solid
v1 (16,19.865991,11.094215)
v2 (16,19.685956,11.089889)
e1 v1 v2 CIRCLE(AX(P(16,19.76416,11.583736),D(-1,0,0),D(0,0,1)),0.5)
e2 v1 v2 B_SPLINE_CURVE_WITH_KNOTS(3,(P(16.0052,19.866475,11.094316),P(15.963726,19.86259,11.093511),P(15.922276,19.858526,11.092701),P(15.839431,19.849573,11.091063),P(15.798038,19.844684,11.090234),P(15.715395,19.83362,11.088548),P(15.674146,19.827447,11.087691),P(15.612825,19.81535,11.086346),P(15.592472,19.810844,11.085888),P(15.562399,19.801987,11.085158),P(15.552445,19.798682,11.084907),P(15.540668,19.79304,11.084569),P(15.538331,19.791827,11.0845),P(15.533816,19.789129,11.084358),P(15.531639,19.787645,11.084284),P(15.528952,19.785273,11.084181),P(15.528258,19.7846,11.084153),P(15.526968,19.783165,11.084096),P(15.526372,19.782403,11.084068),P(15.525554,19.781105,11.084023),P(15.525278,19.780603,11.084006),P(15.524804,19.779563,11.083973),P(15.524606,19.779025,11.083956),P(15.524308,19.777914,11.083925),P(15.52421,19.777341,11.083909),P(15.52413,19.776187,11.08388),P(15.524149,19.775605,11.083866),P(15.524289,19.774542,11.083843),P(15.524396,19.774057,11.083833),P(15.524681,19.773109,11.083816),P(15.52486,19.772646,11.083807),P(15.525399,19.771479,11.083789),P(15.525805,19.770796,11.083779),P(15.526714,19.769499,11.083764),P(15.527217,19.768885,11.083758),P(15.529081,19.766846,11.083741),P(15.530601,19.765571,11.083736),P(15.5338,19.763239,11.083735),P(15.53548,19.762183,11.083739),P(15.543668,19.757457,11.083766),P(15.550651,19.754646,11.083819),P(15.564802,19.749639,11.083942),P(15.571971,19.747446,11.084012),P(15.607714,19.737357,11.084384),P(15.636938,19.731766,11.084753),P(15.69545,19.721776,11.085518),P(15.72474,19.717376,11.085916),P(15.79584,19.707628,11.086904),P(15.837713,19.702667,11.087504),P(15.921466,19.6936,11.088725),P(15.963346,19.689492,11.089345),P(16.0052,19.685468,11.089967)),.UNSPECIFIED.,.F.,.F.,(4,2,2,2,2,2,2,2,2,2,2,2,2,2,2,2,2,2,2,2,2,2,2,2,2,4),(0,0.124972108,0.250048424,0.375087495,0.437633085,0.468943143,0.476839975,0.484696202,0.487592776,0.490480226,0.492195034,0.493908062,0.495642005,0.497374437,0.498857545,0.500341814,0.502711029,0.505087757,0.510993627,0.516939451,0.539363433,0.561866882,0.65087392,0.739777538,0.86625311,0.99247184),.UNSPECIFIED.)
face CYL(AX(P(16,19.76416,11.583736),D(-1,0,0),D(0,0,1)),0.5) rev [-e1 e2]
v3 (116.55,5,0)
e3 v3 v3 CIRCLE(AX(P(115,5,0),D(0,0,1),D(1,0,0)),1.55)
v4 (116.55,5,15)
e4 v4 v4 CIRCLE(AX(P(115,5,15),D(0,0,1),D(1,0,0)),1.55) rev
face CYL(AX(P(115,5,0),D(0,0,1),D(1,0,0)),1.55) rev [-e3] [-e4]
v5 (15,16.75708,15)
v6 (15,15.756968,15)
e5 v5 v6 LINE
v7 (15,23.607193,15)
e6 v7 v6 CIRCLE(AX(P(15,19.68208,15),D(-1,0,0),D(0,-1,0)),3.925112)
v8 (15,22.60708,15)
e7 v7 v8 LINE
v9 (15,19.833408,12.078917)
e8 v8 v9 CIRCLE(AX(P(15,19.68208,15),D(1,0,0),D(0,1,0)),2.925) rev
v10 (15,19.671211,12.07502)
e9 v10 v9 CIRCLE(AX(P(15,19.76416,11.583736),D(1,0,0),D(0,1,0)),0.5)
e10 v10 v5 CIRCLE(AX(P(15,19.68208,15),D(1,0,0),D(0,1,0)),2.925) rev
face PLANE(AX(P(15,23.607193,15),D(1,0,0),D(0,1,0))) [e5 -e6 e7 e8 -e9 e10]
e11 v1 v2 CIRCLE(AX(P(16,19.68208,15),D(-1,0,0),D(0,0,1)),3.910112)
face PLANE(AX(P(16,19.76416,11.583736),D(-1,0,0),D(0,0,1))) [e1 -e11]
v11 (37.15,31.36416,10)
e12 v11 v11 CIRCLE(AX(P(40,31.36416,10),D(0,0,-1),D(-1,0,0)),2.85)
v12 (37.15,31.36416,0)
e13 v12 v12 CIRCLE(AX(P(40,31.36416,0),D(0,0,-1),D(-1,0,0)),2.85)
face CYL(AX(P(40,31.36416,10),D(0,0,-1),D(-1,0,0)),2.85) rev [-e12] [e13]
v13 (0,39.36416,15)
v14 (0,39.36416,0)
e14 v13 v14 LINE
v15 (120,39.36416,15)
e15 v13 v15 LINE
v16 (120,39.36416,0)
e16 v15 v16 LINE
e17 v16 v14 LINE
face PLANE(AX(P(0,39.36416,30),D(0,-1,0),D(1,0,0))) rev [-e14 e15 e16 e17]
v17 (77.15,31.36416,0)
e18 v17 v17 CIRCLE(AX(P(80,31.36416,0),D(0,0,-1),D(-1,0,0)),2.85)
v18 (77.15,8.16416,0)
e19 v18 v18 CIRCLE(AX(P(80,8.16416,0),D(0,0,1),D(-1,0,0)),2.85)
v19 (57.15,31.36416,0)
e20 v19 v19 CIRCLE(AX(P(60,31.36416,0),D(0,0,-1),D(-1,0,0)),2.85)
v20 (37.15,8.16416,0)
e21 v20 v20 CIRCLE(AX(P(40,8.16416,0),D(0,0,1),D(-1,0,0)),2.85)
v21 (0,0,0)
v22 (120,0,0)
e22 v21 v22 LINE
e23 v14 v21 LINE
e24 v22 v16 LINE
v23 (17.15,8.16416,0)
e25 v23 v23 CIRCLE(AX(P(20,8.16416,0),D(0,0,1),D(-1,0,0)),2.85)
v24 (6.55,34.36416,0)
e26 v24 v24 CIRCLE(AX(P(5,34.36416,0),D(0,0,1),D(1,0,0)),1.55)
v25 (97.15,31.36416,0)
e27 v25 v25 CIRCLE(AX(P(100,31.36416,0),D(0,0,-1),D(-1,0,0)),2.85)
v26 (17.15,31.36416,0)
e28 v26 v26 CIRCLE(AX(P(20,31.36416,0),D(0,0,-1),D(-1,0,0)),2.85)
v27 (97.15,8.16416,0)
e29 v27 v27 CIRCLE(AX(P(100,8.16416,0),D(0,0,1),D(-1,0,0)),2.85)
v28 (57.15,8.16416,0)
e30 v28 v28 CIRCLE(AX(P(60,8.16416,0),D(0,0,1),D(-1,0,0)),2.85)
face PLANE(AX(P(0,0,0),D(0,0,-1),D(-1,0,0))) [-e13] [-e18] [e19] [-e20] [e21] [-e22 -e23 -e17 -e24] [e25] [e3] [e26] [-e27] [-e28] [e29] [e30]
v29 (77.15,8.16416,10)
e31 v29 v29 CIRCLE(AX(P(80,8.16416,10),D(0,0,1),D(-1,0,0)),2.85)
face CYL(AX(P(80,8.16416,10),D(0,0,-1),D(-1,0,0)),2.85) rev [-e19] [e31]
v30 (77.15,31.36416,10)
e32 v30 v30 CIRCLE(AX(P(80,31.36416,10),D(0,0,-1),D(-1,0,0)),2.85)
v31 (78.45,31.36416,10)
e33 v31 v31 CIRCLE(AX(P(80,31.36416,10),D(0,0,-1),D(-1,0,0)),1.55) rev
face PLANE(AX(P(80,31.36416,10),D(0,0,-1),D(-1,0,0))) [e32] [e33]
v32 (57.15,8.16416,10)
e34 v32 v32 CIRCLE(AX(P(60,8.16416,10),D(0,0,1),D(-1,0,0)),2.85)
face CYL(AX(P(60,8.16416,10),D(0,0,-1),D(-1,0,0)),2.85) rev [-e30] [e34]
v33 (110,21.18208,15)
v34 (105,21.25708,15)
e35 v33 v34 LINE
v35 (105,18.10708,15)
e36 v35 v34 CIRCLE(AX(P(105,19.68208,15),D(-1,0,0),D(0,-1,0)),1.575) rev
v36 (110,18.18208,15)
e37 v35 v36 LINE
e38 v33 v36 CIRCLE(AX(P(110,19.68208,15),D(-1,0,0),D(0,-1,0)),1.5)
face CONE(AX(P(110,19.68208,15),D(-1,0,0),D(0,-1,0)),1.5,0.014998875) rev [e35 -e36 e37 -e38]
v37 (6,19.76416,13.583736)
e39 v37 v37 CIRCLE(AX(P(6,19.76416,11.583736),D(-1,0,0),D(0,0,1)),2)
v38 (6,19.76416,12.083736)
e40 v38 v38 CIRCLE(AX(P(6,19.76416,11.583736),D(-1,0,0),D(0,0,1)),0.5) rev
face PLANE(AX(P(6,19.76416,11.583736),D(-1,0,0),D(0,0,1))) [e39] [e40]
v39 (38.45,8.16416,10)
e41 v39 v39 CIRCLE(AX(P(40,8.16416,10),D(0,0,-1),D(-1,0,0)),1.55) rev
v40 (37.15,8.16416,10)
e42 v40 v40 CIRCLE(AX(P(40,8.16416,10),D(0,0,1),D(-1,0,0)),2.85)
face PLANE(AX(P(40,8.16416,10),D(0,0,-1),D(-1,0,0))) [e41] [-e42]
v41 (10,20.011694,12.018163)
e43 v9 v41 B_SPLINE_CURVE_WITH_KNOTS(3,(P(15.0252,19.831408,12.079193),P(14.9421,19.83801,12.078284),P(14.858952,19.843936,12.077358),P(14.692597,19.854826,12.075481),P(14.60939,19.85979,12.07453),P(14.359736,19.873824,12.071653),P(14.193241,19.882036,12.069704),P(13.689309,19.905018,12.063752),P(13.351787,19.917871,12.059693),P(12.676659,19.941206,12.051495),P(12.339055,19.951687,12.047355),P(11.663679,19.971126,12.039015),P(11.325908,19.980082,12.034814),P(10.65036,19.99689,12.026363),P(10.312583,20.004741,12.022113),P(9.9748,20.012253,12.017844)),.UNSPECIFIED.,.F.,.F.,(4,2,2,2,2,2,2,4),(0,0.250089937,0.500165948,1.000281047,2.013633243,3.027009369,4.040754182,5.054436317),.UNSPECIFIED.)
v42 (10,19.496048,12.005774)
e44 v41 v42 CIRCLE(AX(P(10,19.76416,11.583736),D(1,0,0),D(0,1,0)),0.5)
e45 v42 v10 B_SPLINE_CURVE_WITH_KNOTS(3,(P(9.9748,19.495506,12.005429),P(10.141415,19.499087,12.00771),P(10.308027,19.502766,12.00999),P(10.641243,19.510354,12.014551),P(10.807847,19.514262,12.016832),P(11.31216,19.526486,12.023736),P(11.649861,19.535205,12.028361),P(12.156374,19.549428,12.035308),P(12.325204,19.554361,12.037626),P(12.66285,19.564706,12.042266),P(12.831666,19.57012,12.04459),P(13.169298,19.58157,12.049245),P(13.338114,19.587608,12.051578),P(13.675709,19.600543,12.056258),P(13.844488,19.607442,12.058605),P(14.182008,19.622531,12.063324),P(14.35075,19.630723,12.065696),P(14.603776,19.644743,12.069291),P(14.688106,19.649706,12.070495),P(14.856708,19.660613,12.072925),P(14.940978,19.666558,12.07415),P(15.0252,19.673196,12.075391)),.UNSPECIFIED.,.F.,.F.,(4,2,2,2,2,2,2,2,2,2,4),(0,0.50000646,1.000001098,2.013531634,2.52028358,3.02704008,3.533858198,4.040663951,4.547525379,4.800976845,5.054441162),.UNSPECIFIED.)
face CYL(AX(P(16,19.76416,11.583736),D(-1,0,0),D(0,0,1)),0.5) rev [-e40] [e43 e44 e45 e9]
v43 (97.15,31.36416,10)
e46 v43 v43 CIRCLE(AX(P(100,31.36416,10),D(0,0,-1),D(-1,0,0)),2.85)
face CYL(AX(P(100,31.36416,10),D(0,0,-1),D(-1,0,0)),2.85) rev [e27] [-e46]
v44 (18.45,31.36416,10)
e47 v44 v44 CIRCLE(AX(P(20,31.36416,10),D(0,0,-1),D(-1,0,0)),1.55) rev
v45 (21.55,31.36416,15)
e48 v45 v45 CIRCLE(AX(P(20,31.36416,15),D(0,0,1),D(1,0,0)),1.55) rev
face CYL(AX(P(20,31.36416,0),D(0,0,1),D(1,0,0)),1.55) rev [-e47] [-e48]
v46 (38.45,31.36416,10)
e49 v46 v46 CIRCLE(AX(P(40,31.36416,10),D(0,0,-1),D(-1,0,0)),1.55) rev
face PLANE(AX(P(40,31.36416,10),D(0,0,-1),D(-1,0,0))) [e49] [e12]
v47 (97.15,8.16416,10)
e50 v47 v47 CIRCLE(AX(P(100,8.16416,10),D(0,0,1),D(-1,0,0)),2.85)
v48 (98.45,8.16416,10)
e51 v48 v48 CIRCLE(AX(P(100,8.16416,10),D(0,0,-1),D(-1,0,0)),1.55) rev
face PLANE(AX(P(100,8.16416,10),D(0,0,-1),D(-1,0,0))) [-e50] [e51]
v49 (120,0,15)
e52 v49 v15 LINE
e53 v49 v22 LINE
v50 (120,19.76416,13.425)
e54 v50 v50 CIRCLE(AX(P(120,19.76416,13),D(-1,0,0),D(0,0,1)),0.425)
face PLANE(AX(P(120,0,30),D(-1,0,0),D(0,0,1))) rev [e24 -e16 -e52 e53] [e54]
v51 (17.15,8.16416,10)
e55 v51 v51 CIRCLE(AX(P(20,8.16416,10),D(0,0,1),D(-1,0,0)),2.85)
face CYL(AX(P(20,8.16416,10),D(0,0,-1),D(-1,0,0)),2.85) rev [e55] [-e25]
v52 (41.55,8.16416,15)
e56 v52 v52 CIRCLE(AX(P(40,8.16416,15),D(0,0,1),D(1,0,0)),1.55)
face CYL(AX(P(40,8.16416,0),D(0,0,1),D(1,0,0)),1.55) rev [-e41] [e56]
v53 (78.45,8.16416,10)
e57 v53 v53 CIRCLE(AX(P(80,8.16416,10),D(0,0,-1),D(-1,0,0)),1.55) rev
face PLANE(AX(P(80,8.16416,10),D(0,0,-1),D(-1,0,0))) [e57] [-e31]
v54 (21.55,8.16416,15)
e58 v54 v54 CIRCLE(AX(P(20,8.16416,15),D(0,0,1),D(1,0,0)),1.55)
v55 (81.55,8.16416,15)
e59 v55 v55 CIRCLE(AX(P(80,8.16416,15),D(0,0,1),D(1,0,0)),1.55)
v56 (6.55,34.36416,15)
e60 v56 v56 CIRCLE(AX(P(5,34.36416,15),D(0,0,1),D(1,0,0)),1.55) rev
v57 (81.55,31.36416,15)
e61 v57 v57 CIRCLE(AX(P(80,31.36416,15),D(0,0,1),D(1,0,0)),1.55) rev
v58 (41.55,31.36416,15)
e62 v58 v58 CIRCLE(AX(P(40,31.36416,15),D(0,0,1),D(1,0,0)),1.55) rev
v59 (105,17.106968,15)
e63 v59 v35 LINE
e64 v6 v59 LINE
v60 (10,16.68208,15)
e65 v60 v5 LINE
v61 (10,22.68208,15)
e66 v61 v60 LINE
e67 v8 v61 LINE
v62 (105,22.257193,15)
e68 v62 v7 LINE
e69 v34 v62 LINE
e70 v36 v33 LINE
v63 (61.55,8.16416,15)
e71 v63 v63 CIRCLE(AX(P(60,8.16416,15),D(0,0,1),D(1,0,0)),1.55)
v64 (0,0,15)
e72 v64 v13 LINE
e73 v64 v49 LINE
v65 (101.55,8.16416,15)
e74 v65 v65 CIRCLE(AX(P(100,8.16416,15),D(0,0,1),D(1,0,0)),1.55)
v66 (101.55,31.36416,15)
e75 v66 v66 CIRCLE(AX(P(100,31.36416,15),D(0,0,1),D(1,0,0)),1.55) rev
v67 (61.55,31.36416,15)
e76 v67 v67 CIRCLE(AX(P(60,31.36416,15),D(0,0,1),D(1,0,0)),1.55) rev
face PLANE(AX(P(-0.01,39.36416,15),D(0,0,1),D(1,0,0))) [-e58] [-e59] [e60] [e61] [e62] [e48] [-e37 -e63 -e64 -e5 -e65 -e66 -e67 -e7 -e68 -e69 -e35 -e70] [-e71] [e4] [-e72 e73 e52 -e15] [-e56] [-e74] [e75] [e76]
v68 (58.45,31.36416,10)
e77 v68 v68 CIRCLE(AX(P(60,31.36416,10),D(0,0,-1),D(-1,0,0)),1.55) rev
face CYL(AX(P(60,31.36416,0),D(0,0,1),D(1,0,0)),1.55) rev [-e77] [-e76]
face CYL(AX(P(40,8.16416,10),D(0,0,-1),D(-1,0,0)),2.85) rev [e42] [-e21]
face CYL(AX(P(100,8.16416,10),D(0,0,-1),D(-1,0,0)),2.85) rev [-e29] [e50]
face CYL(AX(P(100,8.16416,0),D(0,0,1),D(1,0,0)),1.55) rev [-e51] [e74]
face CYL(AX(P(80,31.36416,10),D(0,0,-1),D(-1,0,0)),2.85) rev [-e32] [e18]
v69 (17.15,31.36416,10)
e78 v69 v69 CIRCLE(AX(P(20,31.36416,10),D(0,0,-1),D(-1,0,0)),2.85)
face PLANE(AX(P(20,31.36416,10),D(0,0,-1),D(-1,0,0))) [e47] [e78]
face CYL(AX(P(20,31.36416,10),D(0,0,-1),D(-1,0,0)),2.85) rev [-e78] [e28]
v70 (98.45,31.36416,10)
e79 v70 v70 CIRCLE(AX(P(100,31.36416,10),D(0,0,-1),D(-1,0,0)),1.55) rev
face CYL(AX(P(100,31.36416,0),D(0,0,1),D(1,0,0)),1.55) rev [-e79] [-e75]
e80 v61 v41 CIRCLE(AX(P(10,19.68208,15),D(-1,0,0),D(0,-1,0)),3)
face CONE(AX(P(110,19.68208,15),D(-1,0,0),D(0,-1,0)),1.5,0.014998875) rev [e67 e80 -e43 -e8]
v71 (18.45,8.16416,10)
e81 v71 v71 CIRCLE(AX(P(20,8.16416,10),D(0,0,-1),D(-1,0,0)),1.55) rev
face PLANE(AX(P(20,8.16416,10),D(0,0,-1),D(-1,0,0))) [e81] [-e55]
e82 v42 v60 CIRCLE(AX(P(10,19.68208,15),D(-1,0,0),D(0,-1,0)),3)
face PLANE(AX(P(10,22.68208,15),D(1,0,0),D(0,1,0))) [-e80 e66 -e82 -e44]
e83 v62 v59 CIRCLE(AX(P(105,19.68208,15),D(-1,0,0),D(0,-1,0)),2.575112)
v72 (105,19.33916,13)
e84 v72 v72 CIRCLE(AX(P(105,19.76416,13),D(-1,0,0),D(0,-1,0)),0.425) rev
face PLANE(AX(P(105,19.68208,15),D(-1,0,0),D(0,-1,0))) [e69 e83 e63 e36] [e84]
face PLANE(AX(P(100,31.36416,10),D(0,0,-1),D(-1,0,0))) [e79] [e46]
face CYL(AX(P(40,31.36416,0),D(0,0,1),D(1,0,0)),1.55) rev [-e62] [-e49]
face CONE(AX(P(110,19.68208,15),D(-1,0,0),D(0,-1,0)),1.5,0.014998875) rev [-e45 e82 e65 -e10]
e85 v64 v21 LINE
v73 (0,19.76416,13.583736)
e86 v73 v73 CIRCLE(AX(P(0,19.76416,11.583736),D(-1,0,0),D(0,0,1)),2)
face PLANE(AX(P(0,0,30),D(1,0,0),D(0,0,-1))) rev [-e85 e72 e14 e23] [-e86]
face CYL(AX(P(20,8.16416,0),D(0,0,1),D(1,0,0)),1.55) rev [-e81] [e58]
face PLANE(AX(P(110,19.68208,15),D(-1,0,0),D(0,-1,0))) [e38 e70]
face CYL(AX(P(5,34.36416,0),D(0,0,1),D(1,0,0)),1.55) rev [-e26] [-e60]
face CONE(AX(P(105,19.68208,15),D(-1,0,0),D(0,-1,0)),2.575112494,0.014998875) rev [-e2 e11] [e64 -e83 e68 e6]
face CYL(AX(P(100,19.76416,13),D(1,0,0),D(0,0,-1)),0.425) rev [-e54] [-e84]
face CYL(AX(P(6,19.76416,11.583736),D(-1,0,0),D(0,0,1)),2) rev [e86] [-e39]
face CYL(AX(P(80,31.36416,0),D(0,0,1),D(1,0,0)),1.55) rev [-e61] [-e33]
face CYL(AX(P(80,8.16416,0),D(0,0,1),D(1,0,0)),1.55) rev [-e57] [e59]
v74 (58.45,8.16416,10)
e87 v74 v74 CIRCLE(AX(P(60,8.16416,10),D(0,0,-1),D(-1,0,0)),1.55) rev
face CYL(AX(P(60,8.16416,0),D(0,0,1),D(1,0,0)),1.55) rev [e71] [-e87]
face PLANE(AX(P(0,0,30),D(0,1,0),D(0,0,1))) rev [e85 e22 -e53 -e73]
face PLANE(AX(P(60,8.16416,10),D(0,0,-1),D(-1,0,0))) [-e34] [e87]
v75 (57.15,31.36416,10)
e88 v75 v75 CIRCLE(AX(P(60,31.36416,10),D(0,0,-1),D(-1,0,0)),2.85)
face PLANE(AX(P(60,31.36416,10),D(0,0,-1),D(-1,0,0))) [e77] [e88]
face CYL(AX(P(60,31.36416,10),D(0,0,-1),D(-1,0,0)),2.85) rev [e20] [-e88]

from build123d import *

# Parameters (mm, degrees)
SKIZZE2_W                        = 120
SKIZZE2_H                        = 39.364160046
AUFSATZ_LINEAR_AUSTRAGEN1_DEPTH  = 30
SKIZZE24_R                       = 1.55
SCHNITT_LINEAR_AUSTRAGEN4_DEPTH  = 130.805766806
SKIZZE46_R                       = 2.85
SCHNITT_LINEAR_AUSTRAGEN15_DEPTH = 10
SCHNITT_LINEAR_START             = -5
SCHNITT_LINEAR_AUSTRAGEN25_DEPTH = 2.7
LINEARES_MUSTER1_COUNT           = 5
LINEARES_MUSTER1_PITCH           = 20
SPIEGELN2_COPY_1_SKETCH_R        = 2.85
SPIEGELN2_COPY_1_DEPTH           = 10
SPIEGELN2_COPY_2_SKETCH_R        = 2.85
SPIEGELN2_COPY_2_DEPTH           = 10
SPIEGELN2_COPY_3_SKETCH_R        = 2.85
SPIEGELN2_COPY_3_DEPTH           = 10
SPIEGELN2_COPY_4_SKETCH_R        = 2.85
SPIEGELN2_COPY_4_DEPTH           = 10
SPIEGELN2_START                  = -5
SPIEGELN2_COPY_5_DEPTH           = 2.7
SPIEGELN2_COPY_6_DEPTH           = 2.7
SPIEGELN2_COPY_7_DEPTH           = 2.7
SPIEGELN2_COPY_8_DEPTH           = 2.7
SKIZZE51_R                       = 1.55
SCHNITT_LINEAR_AUSTRAGEN26_DEPTH = 130.805766806
SKIZZE67_R                       = 0.425
SCHNITT_LINEAR_AUSTRAGEN30_DEPTH = 20
SKIZZE70_R                       = 0.5
SCHNITT_LINEAR_AUSTRAGEN37_DEPTH = 16
SKIZZE71_R                       = 2
SCHNITT_LINEAR_AUSTRAGEN38_DEPTH = 6
ABSPALTEN3_START                 = 15
ABSPALTEN3_OUTLINE_W             = 120
ABSPALTEN3_OUTLINE_H             = 39.364160046
ABSPALTEN3_OUTLINE_R             = 1.55
ABSPALTEN3_DEPTH                 = 15


# Read off the part's stored shape, not the designer's step: Abspalten3
with BuildPart() as part:
    # Skizze2 → Aufsatz-Linear austragen1 (new body)
    with BuildSketch(Plane.XY):
        with Locations((60, 19.682080023)):
            Rectangle(SKIZZE2_W, SKIZZE2_H)
    extrude(amount=AUFSATZ_LINEAR_AUSTRAGEN1_DEPTH)

    # Skizze24 → Schnitt-Linear austragen4 (cut, through all)
    with BuildSketch(Plane.XY.offset(30)):
        with Locations((20, 31.364160046)):
            Circle(SKIZZE24_R)
        with Locations((40, 31.364160046)):
            Circle(SKIZZE24_R)
        with Locations((60, 31.364160046)):
            Circle(SKIZZE24_R)
        with Locations((80, 31.364160046)):
            Circle(SKIZZE24_R)
        with Locations((100, 31.364160046)):
            Circle(SKIZZE24_R)
    schnitt_linear_austragen4 = extrude(amount=-SCHNITT_LINEAR_AUSTRAGEN4_DEPTH, mode=Mode.SUBTRACT)

    # Skizze46 → Schnitt-Linear austragen15 (cut)
    with BuildSketch(Plane(origin=(0, 0, 0), x_dir=(-1, 0, 0), z_dir=(0, 0, -1))):
        with Locations((-100, 31.364160046)):
            Circle(SKIZZE46_R)
    schnitt_linear_austragen15 = extrude(amount=-SCHNITT_LINEAR_AUSTRAGEN15_DEPTH, mode=Mode.SUBTRACT)

    # Skizze50 → Schnitt-Linear austragen25 (cut)
    with BuildSketch(Plane.XY.offset(30).offset(SCHNITT_LINEAR_START)):
        Polygon((97.15, 33.009608314), (97.15, 39.364160046), (102.85, 39.364160046), (102.85, 33.009608314), (102.85, 29.718711779), (100, 28.073263512), (97.15, 29.718711779), align=None)
    schnitt_linear_austragen25 = extrude(amount=-SCHNITT_LINEAR_AUSTRAGEN25_DEPTH, mode=Mode.SUBTRACT)

    # Lineares Muster1: Schnitt-Linear austragen15, Schnitt-Linear austragen25 ×5
    with Locations(*[(-i * LINEARES_MUSTER1_PITCH, 0, 0) for i in range(1, LINEARES_MUSTER1_COUNT)]):
        add(schnitt_linear_austragen15, mode=Mode.SUBTRACT)
        add(schnitt_linear_austragen25, mode=Mode.SUBTRACT)

    # Spiegeln2: Schnitt-Linear austragen15, Schnitt-Linear austragen25 across plane
    add(schnitt_linear_austragen15.mirror(Plane.ZX.offset(19.764160046)), mode=Mode.SUBTRACT)
    add(schnitt_linear_austragen25.mirror(Plane.ZX.offset(19.764160046)), mode=Mode.SUBTRACT)

    # Spiegeln2 copy 1 sketch → Spiegeln2 copy 1 (cut)
    with BuildSketch(Plane(origin=(-20, 39.528320093, 0), x_dir=(-1, 0, 0), z_dir=(0, 0, -1))):
        with Locations((-100, -31.364160046)):
            Circle(SPIEGELN2_COPY_1_SKETCH_R)
    extrude(amount=-SPIEGELN2_COPY_1_DEPTH, mode=Mode.SUBTRACT)

    # Spiegeln2 copy 2 sketch → Spiegeln2 copy 2 (cut)
    with BuildSketch(Plane(origin=(-40, 39.528320093, 0), x_dir=(-1, 0, 0), z_dir=(0, 0, -1))):
        with Locations((-100, -31.364160046)):
            Circle(SPIEGELN2_COPY_2_SKETCH_R)
    extrude(amount=-SPIEGELN2_COPY_2_DEPTH, mode=Mode.SUBTRACT)

    # Spiegeln2 copy 3 sketch → Spiegeln2 copy 3 (cut)
    with BuildSketch(Plane(origin=(-60, 39.528320093, 0), x_dir=(-1, 0, 0), z_dir=(0, 0, -1))):
        with Locations((-100, -31.364160046)):
            Circle(SPIEGELN2_COPY_3_SKETCH_R)
    extrude(amount=-SPIEGELN2_COPY_3_DEPTH, mode=Mode.SUBTRACT)

    # Spiegeln2 copy 4 sketch → Spiegeln2 copy 4 (cut)
    with BuildSketch(Plane(origin=(-80, 39.528320093, 0), x_dir=(-1, 0, 0), z_dir=(0, 0, -1))):
        with Locations((-100, -31.364160046)):
            Circle(SPIEGELN2_COPY_4_SKETCH_R)
    extrude(amount=-SPIEGELN2_COPY_4_DEPTH, mode=Mode.SUBTRACT)

    # Spiegeln2 copy 5 sketch → Spiegeln2 copy 5 (cut)
    with BuildSketch(Plane(origin=(-20, 39.528320093, 30), x_dir=(1, 0, 0), z_dir=(0, 0, 1)).offset(SPIEGELN2_START)):
        Polygon((97.15, -33.009608314), (97.15, -39.364160046), (102.85, -39.364160046), (102.85, -33.009608314), (102.85, -29.718711779), (100, -28.073263512), (97.15, -29.718711779), align=None)
    extrude(amount=-SPIEGELN2_COPY_5_DEPTH, mode=Mode.SUBTRACT)

    # Spiegeln2 copy 6 sketch → Spiegeln2 copy 6 (cut)
    with BuildSketch(Plane(origin=(-40, 39.528320093, 30), x_dir=(1, 0, 0), z_dir=(0, 0, 1)).offset(SPIEGELN2_START)):
        Polygon((97.15, -33.009608314), (97.15, -39.364160046), (102.85, -39.364160046), (102.85, -33.009608314), (102.85, -29.718711779), (100, -28.073263512), (97.15, -29.718711779), align=None)
    extrude(amount=-SPIEGELN2_COPY_6_DEPTH, mode=Mode.SUBTRACT)

    # Spiegeln2 copy 7 sketch → Spiegeln2 copy 7 (cut)
    with BuildSketch(Plane(origin=(-60, 39.528320093, 30), x_dir=(1, 0, 0), z_dir=(0, 0, 1)).offset(SPIEGELN2_START)):
        Polygon((97.15, -33.009608314), (97.15, -39.364160046), (102.85, -39.364160046), (102.85, -33.009608314), (102.85, -29.718711779), (100, -28.073263512), (97.15, -29.718711779), align=None)
    extrude(amount=-SPIEGELN2_COPY_7_DEPTH, mode=Mode.SUBTRACT)

    # Spiegeln2 copy 8 sketch → Spiegeln2 copy 8 (cut)
    with BuildSketch(Plane(origin=(-80, 39.528320093, 30), x_dir=(1, 0, 0), z_dir=(0, 0, 1)).offset(SPIEGELN2_START)):
        Polygon((97.15, -33.009608314), (97.15, -39.364160046), (102.85, -39.364160046), (102.85, -33.009608314), (102.85, -29.718711779), (100, -28.073263512), (97.15, -29.718711779), align=None)
    extrude(amount=-SPIEGELN2_COPY_8_DEPTH, mode=Mode.SUBTRACT)

    # Spiegeln3: Schnitt-Linear austragen4 across plane
    add(schnitt_linear_austragen4.mirror(Plane.ZX.offset(19.764160046)), mode=Mode.SUBTRACT)

    # Skizze51 → Schnitt-Linear austragen26 (cut, through all)
    with BuildSketch(Plane.XY.offset(30)):
        with Locations((5, 34.364160046)):
            Circle(SKIZZE51_R)
        with Locations((115, 5)):
            Circle(SKIZZE51_R)
    extrude(amount=-SCHNITT_LINEAR_AUSTRAGEN26_DEPTH, mode=Mode.SUBTRACT)

    # Skizze66 → Schnitt-Rotation5 (revolve, cut)
    with BuildSketch(Plane.XY.offset(15), mode=Mode.PRIVATE) as schnitt_rotation5_sk:
        Polygon((110, 19.682080023), (110, 21.182080023), (10, 22.682080023), (10, 19.682080023), align=None)
        Polygon((105, 19.682080023), (105, 22.257192517), (15, 23.607192517), (15, 19.682080023), align=None)
    revolve(schnitt_rotation5_sk.sketch.rotate(Axis((10, 19.682080023, 15), (1, 0, 0)), 180), axis=Axis((10, 19.682080023, 15), (1, 0, 0)), mode=Mode.SUBTRACT)

    # Skizze67 → Schnitt-Linear austragen30 (cut)
    with BuildSketch(Plane(origin=(120, 0, 0), x_dir=(0, 0, -1), z_dir=(1, 0, 0))):
        with Locations((-17, 19.764160046)):
            Circle(SKIZZE67_R)
    schnitt_linear_austragen30 = extrude(amount=-SCHNITT_LINEAR_AUSTRAGEN30_DEPTH, mode=Mode.SUBTRACT)

    # Spiegeln7: Schnitt-Linear austragen30 across plane
    add(schnitt_linear_austragen30.mirror(Plane.XY.offset(15)), mode=Mode.SUBTRACT)

    # Skizze70 → Schnitt-Linear austragen37 (cut)
    with BuildSketch(Plane.ZY):
        with Locations((11.58373564, 19.764160046)):
            Circle(SKIZZE70_R)
    extrude(amount=-SCHNITT_LINEAR_AUSTRAGEN37_DEPTH, mode=Mode.SUBTRACT)

    # Skizze71 → Schnitt-Linear austragen38 (cut)
    with BuildSketch(Plane.ZY):
        with Locations((11.58373564, 19.764160046)):
            Circle(SKIZZE71_R)
    extrude(amount=-SCHNITT_LINEAR_AUSTRAGEN38_DEPTH, mode=Mode.SUBTRACT)

    # Abspalten3 outline → Abspalten3 (cut)
    with BuildSketch(Plane.XY.offset(ABSPALTEN3_START)):
        with Locations((60, 19.682080023)):
            Rectangle(ABSPALTEN3_OUTLINE_W, ABSPALTEN3_OUTLINE_H)
        with Locations((115, 5)):
            Circle(ABSPALTEN3_OUTLINE_R, mode=Mode.SUBTRACT)
        with Locations((5, 34.364160046)):
            Circle(ABSPALTEN3_OUTLINE_R, mode=Mode.SUBTRACT)
        with Locations((20, 31.364160046)):
            Circle(ABSPALTEN3_OUTLINE_R, mode=Mode.SUBTRACT)
        with Locations((40, 31.364160046)):
            Circle(ABSPALTEN3_OUTLINE_R, mode=Mode.SUBTRACT)
        with Locations((60, 31.364160046)):
            Circle(ABSPALTEN3_OUTLINE_R, mode=Mode.SUBTRACT)
        with Locations((80, 31.364160046)):
            Circle(ABSPALTEN3_OUTLINE_R, mode=Mode.SUBTRACT)
        with Locations((100, 31.364160046)):
            Circle(ABSPALTEN3_OUTLINE_R, mode=Mode.SUBTRACT)
        with Locations((20, 8.164160046)):
            Circle(ABSPALTEN3_OUTLINE_R, mode=Mode.SUBTRACT)
        with Locations((40, 8.164160046)):
            Circle(ABSPALTEN3_OUTLINE_R, mode=Mode.SUBTRACT)
        with Locations((60, 8.164160046)):
            Circle(ABSPALTEN3_OUTLINE_R, mode=Mode.SUBTRACT)
        with Locations((80, 8.164160046)):
            Circle(ABSPALTEN3_OUTLINE_R, mode=Mode.SUBTRACT)
        with Locations((100, 8.164160046)):
            Circle(ABSPALTEN3_OUTLINE_R, mode=Mode.SUBTRACT)
    extrude(amount=ABSPALTEN3_DEPTH, mode=Mode.SUBTRACT)


solid = part.part
